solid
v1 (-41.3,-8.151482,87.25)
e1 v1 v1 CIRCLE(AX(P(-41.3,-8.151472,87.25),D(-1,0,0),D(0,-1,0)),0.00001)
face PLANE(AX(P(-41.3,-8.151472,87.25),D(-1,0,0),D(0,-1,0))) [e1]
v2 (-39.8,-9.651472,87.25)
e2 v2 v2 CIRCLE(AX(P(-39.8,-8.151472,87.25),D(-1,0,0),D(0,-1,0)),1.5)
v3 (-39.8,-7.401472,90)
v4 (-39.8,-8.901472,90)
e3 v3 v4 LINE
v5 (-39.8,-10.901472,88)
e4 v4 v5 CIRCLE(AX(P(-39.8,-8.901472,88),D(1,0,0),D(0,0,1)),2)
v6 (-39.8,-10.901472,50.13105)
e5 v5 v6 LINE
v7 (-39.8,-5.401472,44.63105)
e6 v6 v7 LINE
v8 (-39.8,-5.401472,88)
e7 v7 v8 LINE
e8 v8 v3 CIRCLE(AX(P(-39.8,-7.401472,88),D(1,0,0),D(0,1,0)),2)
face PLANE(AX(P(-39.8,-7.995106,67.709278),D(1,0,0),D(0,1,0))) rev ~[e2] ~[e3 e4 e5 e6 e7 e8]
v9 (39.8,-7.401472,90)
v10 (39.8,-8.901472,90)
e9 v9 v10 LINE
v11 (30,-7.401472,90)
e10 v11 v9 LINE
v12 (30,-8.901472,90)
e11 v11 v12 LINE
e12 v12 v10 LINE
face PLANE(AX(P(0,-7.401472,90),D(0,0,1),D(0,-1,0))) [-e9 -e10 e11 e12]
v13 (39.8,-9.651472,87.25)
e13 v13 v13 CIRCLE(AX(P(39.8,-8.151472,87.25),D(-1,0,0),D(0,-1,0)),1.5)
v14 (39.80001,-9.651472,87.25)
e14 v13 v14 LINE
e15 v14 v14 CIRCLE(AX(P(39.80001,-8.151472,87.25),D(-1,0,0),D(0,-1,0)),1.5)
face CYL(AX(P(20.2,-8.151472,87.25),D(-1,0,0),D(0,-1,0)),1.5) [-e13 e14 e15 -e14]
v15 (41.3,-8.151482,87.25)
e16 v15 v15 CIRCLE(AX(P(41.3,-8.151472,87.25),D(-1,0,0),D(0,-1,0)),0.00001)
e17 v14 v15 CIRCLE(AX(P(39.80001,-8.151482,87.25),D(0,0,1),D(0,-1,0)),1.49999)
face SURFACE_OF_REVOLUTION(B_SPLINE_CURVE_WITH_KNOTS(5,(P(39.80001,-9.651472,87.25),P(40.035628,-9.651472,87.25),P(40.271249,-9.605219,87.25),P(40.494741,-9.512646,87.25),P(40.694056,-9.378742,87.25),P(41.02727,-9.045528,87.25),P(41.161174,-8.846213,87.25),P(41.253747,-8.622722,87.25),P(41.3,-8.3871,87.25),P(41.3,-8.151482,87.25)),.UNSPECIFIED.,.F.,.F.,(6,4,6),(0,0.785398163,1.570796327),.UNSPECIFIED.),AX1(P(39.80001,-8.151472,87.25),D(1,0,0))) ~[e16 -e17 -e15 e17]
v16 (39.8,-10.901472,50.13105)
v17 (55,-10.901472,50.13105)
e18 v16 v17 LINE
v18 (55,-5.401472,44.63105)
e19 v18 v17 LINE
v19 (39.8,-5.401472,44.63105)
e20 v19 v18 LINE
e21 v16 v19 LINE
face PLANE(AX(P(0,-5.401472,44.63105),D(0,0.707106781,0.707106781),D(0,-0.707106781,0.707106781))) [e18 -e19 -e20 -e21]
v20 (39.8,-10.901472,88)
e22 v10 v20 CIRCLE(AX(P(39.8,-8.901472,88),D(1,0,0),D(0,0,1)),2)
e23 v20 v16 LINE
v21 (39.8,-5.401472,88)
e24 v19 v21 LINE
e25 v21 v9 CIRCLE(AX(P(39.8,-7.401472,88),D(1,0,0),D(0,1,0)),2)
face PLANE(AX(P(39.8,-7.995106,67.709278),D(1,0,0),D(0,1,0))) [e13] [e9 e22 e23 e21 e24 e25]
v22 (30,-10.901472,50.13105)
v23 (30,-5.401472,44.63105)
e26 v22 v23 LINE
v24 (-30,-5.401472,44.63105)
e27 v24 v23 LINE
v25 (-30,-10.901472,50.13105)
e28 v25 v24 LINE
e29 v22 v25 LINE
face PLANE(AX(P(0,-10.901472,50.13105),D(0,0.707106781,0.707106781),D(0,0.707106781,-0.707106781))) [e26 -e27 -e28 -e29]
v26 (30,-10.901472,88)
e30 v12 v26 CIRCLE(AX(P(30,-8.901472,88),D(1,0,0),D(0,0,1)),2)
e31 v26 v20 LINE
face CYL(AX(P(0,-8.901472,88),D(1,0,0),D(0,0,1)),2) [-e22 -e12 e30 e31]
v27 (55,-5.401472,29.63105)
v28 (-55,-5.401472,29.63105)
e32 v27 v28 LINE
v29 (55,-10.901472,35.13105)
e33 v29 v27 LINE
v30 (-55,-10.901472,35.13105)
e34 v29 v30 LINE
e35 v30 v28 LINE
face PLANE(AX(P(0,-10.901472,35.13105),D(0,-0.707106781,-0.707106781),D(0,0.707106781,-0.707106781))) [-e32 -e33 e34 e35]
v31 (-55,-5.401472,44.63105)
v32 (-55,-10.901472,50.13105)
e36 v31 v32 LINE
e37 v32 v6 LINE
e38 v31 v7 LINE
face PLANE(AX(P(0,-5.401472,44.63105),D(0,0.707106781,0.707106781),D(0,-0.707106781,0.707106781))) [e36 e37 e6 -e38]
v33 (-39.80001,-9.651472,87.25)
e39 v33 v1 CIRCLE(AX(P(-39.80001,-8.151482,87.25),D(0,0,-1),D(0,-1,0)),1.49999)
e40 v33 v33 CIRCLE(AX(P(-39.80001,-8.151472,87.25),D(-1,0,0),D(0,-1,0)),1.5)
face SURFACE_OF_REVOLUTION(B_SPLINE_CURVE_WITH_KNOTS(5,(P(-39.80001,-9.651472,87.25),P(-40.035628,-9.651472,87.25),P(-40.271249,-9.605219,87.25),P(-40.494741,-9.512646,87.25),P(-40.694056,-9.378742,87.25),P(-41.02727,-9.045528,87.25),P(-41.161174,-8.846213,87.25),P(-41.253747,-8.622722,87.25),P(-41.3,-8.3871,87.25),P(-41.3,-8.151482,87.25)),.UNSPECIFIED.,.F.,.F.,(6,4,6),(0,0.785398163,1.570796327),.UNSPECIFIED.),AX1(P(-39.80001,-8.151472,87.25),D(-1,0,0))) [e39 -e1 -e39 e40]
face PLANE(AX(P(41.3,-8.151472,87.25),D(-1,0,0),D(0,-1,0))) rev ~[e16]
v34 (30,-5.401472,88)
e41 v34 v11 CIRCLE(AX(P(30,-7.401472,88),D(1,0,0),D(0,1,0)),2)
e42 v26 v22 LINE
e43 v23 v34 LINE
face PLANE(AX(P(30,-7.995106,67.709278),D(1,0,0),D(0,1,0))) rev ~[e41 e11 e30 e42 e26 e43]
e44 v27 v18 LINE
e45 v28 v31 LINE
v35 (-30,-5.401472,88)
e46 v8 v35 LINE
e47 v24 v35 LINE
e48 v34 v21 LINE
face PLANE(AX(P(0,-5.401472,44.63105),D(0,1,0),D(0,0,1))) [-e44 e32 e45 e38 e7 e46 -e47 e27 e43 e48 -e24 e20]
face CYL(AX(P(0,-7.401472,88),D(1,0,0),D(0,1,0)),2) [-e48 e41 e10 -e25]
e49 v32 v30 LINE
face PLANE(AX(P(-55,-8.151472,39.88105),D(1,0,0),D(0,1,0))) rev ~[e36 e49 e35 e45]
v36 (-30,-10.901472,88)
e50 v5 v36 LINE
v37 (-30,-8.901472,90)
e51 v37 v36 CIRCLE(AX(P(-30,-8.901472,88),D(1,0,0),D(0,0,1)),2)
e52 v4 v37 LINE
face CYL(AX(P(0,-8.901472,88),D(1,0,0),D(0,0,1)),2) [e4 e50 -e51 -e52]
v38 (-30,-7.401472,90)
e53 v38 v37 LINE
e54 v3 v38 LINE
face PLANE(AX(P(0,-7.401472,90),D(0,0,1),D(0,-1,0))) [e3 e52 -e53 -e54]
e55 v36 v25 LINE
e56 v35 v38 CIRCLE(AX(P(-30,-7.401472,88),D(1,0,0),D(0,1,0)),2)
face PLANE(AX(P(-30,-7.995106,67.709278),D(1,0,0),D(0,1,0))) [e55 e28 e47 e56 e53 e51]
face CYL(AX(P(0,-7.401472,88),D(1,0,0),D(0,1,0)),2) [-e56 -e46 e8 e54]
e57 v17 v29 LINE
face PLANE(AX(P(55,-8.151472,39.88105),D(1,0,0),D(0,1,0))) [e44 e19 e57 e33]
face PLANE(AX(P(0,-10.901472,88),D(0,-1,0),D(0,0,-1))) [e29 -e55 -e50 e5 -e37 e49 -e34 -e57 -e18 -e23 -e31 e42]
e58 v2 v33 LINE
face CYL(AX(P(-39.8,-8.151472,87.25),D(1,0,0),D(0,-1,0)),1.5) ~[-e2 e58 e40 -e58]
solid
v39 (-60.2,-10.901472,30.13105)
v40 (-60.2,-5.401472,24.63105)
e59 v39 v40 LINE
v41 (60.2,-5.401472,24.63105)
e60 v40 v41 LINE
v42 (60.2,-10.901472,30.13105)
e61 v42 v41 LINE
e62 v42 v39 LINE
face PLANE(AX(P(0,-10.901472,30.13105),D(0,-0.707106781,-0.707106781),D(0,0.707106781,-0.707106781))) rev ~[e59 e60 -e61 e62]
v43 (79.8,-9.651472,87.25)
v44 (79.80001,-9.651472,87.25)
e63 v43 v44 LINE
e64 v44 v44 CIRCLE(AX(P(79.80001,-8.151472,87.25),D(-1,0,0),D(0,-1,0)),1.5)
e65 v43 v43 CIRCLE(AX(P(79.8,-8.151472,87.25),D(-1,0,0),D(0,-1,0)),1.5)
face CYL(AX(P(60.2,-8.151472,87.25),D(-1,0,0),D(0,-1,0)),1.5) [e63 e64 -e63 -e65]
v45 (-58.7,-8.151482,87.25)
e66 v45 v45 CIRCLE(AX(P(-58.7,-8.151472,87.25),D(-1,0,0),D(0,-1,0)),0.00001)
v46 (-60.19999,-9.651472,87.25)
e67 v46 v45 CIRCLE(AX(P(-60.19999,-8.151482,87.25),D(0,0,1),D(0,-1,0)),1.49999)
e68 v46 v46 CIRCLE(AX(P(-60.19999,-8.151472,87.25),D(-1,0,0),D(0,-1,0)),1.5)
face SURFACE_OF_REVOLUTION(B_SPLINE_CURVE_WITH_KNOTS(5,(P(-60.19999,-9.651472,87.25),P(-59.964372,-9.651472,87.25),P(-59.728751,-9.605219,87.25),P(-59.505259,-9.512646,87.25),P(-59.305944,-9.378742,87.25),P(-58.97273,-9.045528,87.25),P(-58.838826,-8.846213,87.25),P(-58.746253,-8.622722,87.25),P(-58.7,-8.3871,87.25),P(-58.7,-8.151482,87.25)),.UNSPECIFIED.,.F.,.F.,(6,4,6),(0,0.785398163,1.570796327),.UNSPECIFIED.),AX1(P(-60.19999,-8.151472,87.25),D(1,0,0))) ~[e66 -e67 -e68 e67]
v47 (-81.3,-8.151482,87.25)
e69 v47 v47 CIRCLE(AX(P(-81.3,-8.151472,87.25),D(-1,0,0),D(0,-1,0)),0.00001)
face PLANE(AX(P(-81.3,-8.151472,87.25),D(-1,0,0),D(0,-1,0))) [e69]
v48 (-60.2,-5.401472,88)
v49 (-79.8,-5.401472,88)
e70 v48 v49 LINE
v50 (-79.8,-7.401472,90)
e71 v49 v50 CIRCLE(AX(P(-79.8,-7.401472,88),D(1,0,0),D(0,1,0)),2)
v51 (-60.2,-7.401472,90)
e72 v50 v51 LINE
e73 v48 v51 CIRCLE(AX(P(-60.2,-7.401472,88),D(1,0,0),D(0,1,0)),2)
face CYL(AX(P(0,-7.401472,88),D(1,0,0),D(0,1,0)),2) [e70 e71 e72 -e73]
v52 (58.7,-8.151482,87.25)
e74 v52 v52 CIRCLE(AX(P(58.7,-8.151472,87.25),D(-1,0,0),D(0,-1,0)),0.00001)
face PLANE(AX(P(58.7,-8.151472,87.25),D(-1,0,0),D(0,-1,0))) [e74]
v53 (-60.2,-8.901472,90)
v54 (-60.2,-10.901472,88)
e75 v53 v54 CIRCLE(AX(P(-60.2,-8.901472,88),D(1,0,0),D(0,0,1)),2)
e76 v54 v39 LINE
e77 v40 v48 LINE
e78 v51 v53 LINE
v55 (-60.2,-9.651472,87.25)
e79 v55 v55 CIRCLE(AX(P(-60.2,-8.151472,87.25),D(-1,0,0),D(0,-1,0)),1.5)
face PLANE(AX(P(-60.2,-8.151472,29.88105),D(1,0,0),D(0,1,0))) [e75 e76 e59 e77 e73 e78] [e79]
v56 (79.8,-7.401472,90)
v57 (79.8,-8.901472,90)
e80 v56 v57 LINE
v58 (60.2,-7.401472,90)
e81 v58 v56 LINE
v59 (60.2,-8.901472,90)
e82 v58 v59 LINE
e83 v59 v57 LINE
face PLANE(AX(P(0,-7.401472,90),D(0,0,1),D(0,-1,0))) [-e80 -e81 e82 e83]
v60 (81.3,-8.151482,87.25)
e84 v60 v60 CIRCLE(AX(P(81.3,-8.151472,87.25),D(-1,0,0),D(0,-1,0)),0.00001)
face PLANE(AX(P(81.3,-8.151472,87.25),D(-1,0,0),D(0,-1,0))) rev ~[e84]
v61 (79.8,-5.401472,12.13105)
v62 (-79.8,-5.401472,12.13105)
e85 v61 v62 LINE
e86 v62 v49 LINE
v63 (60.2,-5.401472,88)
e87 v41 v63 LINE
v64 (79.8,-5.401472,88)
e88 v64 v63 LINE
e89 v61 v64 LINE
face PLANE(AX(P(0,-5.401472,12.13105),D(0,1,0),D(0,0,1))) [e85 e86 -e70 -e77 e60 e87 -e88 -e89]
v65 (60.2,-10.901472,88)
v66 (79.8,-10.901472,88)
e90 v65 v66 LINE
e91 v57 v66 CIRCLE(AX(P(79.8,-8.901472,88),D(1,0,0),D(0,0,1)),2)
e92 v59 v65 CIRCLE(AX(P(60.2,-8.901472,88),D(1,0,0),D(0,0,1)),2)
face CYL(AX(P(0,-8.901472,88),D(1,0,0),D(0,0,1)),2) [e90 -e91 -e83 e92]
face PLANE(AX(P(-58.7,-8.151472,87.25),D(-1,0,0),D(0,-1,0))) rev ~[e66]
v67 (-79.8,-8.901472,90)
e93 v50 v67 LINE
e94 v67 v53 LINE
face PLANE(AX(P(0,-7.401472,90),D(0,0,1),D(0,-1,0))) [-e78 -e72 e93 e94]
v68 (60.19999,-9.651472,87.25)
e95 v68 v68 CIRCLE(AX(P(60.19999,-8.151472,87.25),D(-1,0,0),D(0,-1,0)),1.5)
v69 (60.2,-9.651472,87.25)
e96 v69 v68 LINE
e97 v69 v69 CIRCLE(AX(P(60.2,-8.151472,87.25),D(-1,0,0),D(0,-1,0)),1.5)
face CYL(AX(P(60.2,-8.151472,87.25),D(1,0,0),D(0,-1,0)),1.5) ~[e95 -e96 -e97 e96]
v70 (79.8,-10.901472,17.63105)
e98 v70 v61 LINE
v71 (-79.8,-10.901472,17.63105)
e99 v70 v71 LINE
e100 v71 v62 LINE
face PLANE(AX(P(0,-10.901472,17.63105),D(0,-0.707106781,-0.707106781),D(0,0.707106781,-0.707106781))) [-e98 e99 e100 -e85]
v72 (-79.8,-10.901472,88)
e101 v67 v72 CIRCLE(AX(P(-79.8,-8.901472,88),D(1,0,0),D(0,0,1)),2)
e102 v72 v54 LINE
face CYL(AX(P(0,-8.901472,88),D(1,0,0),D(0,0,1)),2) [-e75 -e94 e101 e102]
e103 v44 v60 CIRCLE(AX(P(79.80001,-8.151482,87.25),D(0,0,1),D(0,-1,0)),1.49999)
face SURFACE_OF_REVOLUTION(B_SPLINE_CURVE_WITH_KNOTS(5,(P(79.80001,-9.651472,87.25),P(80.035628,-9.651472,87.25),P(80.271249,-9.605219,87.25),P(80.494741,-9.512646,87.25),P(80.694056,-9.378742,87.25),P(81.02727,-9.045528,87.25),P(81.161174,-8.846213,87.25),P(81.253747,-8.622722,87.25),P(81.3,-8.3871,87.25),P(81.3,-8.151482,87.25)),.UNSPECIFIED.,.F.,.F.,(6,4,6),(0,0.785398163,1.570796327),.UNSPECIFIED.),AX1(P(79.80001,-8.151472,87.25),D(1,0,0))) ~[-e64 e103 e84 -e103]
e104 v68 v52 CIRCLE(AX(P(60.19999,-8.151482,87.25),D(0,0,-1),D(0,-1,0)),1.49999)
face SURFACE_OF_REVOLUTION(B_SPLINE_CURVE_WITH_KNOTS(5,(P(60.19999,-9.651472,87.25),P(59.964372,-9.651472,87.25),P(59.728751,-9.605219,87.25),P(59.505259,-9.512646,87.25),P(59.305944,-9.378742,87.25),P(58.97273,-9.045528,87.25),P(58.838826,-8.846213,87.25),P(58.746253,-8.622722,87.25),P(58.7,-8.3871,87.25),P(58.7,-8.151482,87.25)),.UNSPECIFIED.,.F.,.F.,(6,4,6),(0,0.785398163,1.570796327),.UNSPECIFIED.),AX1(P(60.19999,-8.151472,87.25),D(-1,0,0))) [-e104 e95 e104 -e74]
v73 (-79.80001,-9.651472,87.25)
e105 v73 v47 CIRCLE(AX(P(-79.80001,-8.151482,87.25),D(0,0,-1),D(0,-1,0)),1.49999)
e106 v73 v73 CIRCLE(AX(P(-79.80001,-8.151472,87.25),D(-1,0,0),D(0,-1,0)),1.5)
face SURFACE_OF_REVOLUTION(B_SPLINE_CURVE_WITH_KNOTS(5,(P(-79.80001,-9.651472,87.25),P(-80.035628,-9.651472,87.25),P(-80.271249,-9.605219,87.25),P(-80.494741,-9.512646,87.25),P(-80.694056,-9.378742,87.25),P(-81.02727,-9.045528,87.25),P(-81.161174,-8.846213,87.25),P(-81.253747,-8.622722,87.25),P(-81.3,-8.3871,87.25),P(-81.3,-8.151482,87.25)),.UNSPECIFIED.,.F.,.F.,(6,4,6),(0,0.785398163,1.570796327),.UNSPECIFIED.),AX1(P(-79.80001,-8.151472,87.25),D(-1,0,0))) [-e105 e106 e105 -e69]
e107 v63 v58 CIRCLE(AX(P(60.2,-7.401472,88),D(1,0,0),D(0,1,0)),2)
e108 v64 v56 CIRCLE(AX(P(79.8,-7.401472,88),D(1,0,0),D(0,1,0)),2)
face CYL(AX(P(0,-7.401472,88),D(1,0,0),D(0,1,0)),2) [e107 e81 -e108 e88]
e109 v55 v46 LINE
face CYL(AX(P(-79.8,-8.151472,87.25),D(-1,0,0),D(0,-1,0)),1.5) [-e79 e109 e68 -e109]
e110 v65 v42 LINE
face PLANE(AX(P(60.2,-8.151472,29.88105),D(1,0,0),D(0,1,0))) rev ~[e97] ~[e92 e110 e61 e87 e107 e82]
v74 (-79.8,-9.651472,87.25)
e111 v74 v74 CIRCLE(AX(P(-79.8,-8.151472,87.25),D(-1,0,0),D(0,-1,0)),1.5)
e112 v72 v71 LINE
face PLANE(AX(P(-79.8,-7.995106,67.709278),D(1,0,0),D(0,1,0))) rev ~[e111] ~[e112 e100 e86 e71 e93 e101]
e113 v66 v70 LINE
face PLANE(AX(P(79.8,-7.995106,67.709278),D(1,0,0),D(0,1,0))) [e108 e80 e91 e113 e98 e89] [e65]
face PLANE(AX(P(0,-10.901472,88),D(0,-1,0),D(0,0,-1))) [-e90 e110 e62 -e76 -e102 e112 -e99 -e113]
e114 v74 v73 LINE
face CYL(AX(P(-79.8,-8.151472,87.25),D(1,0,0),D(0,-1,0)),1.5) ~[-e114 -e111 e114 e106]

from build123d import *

# Parameters (mm, degrees)
F1_DEPTH       = 79.8
F1_DEPTH_BACK  = 79.8
F2_DEPTH       = 60.2
F2_DEPTH_BACK  = 60.2
F3_DEPTH       = 55
F3_DEPTH_BACK  = 55
F4_DEPTH       = 39.8
F4_DEPTH_BACK  = 39.8
F5_DEPTH       = 20.2
F5_DEPTH_BACK  = 20.2
F6_R           = 1.5
F7_DEPTH       = 1.5
F7_DEPTH_BACK  = 21.1
F8_R           = 1.49999
F9_R           = 1.5
F10_DEPTH      = 1.5
F10_DEPTH_BACK = 21.1
F11_R          = 1.49999
F12_R          = 1.5
F13_DEPTH      = 1.5
F13_DEPTH_BACK = 21.1
F14_R          = 1.49999
F15_R          = 1.5
F16_DEPTH      = 1.5
F16_DEPTH_BACK = 21.1
F17_R          = 1.49999
F18_DEPTH      = 30
F18_DEPTH_BACK = 30


# Not quite as in the source:
# - a fillet or chamfer is up to 0.001 mm smaller than in the source, because OpenCascade refuses the exact size


with BuildPart() as f1:
    # F0 (on Right) → F1 (new body, two sides)
    with BuildSketch(Plane.YZ) as f1_sk:
        with BuildLine():
            Line((-5.401472277, 44.6310500277), (-5.401472277, 79.9993566108))
            Line((-5.401472277, 79.9993566108), (-5.401472277, 88))
            ThreePointArc((-5.401472277, 88), (-5.9872587146, 89.4142135624), (-7.401472277, 90))
            Line((-7.401472277, 90), (-8.901472277, 90))
            ThreePointArc((-8.901472277, 90), (-10.3156858394, 89.4142135624), (-10.901472277, 88))
            Line((-10.901472277, 88), (-10.901472277, 80))
            Line((-10.901472277, 80), (-10.901472277, 50.1310500277))
            Line((-10.901472277, 50.1310500277), (-5.401472277, 44.6310500277))
        make_face()
        Polygon((-5.401472277, 29.6310500277), (-5.401472277, 44.6310500277), (-10.901472277, 50.1310500277), (-10.901472277, 35.1310500277), align=None)
        Polygon((-5.401472277, 24.6310500277), (-5.401472277, 29.6310500277), (-10.901472277, 35.1310500277), (-10.901472277, 30.1310500277), align=None)
        Polygon((-5.401472277, 18.0382234147), (-5.401472277, 24.6310500277), (-10.901472277, 30.1310500277), (-10.901472277, 17.6310500277), (-5.401472277, 12.1310500277), align=None)
    extrude(amount=F1_DEPTH)
    extrude(f1_sk.sketch, amount=-F1_DEPTH_BACK)

    # F0 (on Right) → F2 (cut, two sides)
    with BuildSketch(Plane.YZ) as f2_sk:
        Polygon((-5.401472277, 24.6310500277), (-5.401472277, 29.6310500277), (-10.901472277, 35.1310500277), (-10.901472277, 30.1310500277), align=None)
        Polygon((-5.401472277, 29.6310500277), (-5.401472277, 44.6310500277), (-10.901472277, 50.1310500277), (-10.901472277, 35.1310500277), align=None)
        with BuildLine():
            Line((-5.401472277, 44.6310500277), (-5.401472277, 79.9993566108))
            Line((-5.401472277, 79.9993566108), (-5.401472277, 88))
            ThreePointArc((-5.401472277, 88), (-5.9872587146, 89.4142135624), (-7.401472277, 90))
            Line((-7.401472277, 90), (-8.901472277, 90))
            ThreePointArc((-8.901472277, 90), (-10.3156858394, 89.4142135624), (-10.901472277, 88))
            Line((-10.901472277, 88), (-10.901472277, 80))
            Line((-10.901472277, 80), (-10.901472277, 50.1310500277))
            Line((-10.901472277, 50.1310500277), (-5.401472277, 44.6310500277))
        make_face()
    extrude(amount=F2_DEPTH, mode=Mode.SUBTRACT)
    extrude(f2_sk.sketch, amount=-F2_DEPTH_BACK, mode=Mode.SUBTRACT)

    # F6 (on face) → F7 (join, two sides)
    with BuildSketch(Plane(origin=(-79.8, 0, 0), x_dir=(0, -1, 0), z_dir=(-1, 0, 0))) as f7_sk:
        with Locations((8.151472277, 87.25)):
            Circle(F6_R)
    extrude(amount=F7_DEPTH)
    extrude(f7_sk.sketch, amount=-F7_DEPTH_BACK)

    # F8 (radius 1.5 in the source; OpenCascade refuses exactly that, so slightly less here)
    f8_edges = [f1.edges().sort_by_distance(p)[0] for p in [
        (-81.3, -6.651472, 87.25),
        (-58.7, -6.651472, 87.25),
    ]]
    fillet(f8_edges, radius=F8_R)

    # F15 (on face) → F16 (join, two sides)
    with BuildSketch(Plane(origin=(60.2, 0, 0), x_dir=(0, -1, 0), z_dir=(-1, 0, 0))) as f16_sk:
        with Locations((8.151472277, 87.25)):
            Circle(F15_R)
    extrude(amount=F16_DEPTH)
    extrude(f16_sk.sketch, amount=-F16_DEPTH_BACK)

    # F17 (radius 1.5 in the source; OpenCascade refuses exactly that, so slightly less here)
    f17_edges = [f1.edges().sort_by_distance(p)[0] for p in [
        (58.7, -6.651472, 87.25),
        (81.3, -6.651472, 87.25),
    ]]
    fillet(f17_edges, radius=F17_R)


with BuildPart() as f3:
    # F0 (on Right) → F3 (new body, two sides)
    with BuildSketch(Plane.YZ) as f3_sk:
        Polygon((-5.401472277, 29.6310500277), (-5.401472277, 44.6310500277), (-10.901472277, 50.1310500277), (-10.901472277, 35.1310500277), align=None)
    extrude(amount=F3_DEPTH)
    extrude(f3_sk.sketch, amount=-F3_DEPTH_BACK)

    # F0 (on Right) → F4 (join, two sides)
    with BuildSketch(Plane.YZ) as f4_sk:
        with BuildLine():
            Line((-5.401472277, 44.6310500277), (-5.401472277, 79.9993566108))
            Line((-5.401472277, 79.9993566108), (-5.401472277, 88))
            ThreePointArc((-5.401472277, 88), (-5.9872587146, 89.4142135624), (-7.401472277, 90))
            Line((-7.401472277, 90), (-8.901472277, 90))
            ThreePointArc((-8.901472277, 90), (-10.3156858394, 89.4142135624), (-10.901472277, 88))
            Line((-10.901472277, 88), (-10.901472277, 80))
            Line((-10.901472277, 80), (-10.901472277, 50.1310500277))
            Line((-10.901472277, 50.1310500277), (-5.401472277, 44.6310500277))
        make_face()
    extrude(amount=F4_DEPTH)
    extrude(f4_sk.sketch, amount=-F4_DEPTH_BACK)

    # F0 (on Right) → F5 (cut, two sides)
    with BuildSketch(Plane.YZ) as f5_sk:
        with BuildLine():
            Line((-5.401472277, 44.6310500277), (-5.401472277, 79.9993566108))
            Line((-5.401472277, 79.9993566108), (-5.401472277, 88))
            ThreePointArc((-5.401472277, 88), (-5.9872587146, 89.4142135624), (-7.401472277, 90))
            Line((-7.401472277, 90), (-8.901472277, 90))
            ThreePointArc((-8.901472277, 90), (-10.3156858394, 89.4142135624), (-10.901472277, 88))
            Line((-10.901472277, 88), (-10.901472277, 80))
            Line((-10.901472277, 80), (-10.901472277, 50.1310500277))
            Line((-10.901472277, 50.1310500277), (-5.401472277, 44.6310500277))
        make_face()
    extrude(amount=F5_DEPTH, mode=Mode.SUBTRACT)
    extrude(f5_sk.sketch, amount=-F5_DEPTH_BACK, mode=Mode.SUBTRACT)

    # F9 (on face) → F10 (join, two sides)
    with BuildSketch(Plane(origin=(-39.8, 0, 0), x_dir=(0, -1, 0), z_dir=(-1, 0, 0))) as f10_sk:
        with Locations((8.151472277, 87.25)):
            Circle(F9_R)
    extrude(amount=F10_DEPTH)
    extrude(f10_sk.sketch, amount=-F10_DEPTH_BACK)

    # F11 (radius 1.5 in the source; OpenCascade refuses exactly that, so slightly less here)
    f11_edges = [f3.edges().sort_by_distance(p)[0] for p in [
        (-41.3, -6.651472, 87.25),
        (-18.7, -6.651472, 87.25),
    ]]
    fillet(f11_edges, radius=F11_R)

    # F12 (on face) → F13 (join, two sides)
    with BuildSketch(Plane(origin=(20.2, 0, 0), x_dir=(0, -1, 0), z_dir=(-1, 0, 0))) as f13_sk:
        with Locations((8.151472277, 87.25)):
            Circle(F12_R)
    extrude(amount=F13_DEPTH)
    extrude(f13_sk.sketch, amount=-F13_DEPTH_BACK)

    # F14 (radius 1.5 in the source; OpenCascade refuses exactly that, so slightly less here)
    f14_edges = [f3.edges().sort_by_distance(p)[0] for p in [
        (18.7, -6.651472, 87.25),
        (41.3, -6.651472, 87.25),
    ]]
    fillet(f14_edges, radius=F14_R)

    # F0 (on Right) → F18 (cut, two sides)
    with BuildSketch(Plane.YZ) as f18_sk:
        with BuildLine():
            Line((-5.401472277, 44.6310500277), (-5.401472277, 79.9993566108))
            Line((-5.401472277, 79.9993566108), (-5.401472277, 88))
            ThreePointArc((-5.401472277, 88), (-5.9872587146, 89.4142135624), (-7.401472277, 90))
            Line((-7.401472277, 90), (-8.901472277, 90))
            ThreePointArc((-8.901472277, 90), (-10.3156858394, 89.4142135624), (-10.901472277, 88))
            Line((-10.901472277, 88), (-10.901472277, 80))
            Line((-10.901472277, 80), (-10.901472277, 50.1310500277))
            Line((-10.901472277, 50.1310500277), (-5.401472277, 44.6310500277))
        make_face()
    extrude(amount=-F18_DEPTH, mode=Mode.SUBTRACT)
    extrude(f18_sk.sketch, amount=F18_DEPTH_BACK, mode=Mode.SUBTRACT)


solid = Compound([f1.part, f3.part])
